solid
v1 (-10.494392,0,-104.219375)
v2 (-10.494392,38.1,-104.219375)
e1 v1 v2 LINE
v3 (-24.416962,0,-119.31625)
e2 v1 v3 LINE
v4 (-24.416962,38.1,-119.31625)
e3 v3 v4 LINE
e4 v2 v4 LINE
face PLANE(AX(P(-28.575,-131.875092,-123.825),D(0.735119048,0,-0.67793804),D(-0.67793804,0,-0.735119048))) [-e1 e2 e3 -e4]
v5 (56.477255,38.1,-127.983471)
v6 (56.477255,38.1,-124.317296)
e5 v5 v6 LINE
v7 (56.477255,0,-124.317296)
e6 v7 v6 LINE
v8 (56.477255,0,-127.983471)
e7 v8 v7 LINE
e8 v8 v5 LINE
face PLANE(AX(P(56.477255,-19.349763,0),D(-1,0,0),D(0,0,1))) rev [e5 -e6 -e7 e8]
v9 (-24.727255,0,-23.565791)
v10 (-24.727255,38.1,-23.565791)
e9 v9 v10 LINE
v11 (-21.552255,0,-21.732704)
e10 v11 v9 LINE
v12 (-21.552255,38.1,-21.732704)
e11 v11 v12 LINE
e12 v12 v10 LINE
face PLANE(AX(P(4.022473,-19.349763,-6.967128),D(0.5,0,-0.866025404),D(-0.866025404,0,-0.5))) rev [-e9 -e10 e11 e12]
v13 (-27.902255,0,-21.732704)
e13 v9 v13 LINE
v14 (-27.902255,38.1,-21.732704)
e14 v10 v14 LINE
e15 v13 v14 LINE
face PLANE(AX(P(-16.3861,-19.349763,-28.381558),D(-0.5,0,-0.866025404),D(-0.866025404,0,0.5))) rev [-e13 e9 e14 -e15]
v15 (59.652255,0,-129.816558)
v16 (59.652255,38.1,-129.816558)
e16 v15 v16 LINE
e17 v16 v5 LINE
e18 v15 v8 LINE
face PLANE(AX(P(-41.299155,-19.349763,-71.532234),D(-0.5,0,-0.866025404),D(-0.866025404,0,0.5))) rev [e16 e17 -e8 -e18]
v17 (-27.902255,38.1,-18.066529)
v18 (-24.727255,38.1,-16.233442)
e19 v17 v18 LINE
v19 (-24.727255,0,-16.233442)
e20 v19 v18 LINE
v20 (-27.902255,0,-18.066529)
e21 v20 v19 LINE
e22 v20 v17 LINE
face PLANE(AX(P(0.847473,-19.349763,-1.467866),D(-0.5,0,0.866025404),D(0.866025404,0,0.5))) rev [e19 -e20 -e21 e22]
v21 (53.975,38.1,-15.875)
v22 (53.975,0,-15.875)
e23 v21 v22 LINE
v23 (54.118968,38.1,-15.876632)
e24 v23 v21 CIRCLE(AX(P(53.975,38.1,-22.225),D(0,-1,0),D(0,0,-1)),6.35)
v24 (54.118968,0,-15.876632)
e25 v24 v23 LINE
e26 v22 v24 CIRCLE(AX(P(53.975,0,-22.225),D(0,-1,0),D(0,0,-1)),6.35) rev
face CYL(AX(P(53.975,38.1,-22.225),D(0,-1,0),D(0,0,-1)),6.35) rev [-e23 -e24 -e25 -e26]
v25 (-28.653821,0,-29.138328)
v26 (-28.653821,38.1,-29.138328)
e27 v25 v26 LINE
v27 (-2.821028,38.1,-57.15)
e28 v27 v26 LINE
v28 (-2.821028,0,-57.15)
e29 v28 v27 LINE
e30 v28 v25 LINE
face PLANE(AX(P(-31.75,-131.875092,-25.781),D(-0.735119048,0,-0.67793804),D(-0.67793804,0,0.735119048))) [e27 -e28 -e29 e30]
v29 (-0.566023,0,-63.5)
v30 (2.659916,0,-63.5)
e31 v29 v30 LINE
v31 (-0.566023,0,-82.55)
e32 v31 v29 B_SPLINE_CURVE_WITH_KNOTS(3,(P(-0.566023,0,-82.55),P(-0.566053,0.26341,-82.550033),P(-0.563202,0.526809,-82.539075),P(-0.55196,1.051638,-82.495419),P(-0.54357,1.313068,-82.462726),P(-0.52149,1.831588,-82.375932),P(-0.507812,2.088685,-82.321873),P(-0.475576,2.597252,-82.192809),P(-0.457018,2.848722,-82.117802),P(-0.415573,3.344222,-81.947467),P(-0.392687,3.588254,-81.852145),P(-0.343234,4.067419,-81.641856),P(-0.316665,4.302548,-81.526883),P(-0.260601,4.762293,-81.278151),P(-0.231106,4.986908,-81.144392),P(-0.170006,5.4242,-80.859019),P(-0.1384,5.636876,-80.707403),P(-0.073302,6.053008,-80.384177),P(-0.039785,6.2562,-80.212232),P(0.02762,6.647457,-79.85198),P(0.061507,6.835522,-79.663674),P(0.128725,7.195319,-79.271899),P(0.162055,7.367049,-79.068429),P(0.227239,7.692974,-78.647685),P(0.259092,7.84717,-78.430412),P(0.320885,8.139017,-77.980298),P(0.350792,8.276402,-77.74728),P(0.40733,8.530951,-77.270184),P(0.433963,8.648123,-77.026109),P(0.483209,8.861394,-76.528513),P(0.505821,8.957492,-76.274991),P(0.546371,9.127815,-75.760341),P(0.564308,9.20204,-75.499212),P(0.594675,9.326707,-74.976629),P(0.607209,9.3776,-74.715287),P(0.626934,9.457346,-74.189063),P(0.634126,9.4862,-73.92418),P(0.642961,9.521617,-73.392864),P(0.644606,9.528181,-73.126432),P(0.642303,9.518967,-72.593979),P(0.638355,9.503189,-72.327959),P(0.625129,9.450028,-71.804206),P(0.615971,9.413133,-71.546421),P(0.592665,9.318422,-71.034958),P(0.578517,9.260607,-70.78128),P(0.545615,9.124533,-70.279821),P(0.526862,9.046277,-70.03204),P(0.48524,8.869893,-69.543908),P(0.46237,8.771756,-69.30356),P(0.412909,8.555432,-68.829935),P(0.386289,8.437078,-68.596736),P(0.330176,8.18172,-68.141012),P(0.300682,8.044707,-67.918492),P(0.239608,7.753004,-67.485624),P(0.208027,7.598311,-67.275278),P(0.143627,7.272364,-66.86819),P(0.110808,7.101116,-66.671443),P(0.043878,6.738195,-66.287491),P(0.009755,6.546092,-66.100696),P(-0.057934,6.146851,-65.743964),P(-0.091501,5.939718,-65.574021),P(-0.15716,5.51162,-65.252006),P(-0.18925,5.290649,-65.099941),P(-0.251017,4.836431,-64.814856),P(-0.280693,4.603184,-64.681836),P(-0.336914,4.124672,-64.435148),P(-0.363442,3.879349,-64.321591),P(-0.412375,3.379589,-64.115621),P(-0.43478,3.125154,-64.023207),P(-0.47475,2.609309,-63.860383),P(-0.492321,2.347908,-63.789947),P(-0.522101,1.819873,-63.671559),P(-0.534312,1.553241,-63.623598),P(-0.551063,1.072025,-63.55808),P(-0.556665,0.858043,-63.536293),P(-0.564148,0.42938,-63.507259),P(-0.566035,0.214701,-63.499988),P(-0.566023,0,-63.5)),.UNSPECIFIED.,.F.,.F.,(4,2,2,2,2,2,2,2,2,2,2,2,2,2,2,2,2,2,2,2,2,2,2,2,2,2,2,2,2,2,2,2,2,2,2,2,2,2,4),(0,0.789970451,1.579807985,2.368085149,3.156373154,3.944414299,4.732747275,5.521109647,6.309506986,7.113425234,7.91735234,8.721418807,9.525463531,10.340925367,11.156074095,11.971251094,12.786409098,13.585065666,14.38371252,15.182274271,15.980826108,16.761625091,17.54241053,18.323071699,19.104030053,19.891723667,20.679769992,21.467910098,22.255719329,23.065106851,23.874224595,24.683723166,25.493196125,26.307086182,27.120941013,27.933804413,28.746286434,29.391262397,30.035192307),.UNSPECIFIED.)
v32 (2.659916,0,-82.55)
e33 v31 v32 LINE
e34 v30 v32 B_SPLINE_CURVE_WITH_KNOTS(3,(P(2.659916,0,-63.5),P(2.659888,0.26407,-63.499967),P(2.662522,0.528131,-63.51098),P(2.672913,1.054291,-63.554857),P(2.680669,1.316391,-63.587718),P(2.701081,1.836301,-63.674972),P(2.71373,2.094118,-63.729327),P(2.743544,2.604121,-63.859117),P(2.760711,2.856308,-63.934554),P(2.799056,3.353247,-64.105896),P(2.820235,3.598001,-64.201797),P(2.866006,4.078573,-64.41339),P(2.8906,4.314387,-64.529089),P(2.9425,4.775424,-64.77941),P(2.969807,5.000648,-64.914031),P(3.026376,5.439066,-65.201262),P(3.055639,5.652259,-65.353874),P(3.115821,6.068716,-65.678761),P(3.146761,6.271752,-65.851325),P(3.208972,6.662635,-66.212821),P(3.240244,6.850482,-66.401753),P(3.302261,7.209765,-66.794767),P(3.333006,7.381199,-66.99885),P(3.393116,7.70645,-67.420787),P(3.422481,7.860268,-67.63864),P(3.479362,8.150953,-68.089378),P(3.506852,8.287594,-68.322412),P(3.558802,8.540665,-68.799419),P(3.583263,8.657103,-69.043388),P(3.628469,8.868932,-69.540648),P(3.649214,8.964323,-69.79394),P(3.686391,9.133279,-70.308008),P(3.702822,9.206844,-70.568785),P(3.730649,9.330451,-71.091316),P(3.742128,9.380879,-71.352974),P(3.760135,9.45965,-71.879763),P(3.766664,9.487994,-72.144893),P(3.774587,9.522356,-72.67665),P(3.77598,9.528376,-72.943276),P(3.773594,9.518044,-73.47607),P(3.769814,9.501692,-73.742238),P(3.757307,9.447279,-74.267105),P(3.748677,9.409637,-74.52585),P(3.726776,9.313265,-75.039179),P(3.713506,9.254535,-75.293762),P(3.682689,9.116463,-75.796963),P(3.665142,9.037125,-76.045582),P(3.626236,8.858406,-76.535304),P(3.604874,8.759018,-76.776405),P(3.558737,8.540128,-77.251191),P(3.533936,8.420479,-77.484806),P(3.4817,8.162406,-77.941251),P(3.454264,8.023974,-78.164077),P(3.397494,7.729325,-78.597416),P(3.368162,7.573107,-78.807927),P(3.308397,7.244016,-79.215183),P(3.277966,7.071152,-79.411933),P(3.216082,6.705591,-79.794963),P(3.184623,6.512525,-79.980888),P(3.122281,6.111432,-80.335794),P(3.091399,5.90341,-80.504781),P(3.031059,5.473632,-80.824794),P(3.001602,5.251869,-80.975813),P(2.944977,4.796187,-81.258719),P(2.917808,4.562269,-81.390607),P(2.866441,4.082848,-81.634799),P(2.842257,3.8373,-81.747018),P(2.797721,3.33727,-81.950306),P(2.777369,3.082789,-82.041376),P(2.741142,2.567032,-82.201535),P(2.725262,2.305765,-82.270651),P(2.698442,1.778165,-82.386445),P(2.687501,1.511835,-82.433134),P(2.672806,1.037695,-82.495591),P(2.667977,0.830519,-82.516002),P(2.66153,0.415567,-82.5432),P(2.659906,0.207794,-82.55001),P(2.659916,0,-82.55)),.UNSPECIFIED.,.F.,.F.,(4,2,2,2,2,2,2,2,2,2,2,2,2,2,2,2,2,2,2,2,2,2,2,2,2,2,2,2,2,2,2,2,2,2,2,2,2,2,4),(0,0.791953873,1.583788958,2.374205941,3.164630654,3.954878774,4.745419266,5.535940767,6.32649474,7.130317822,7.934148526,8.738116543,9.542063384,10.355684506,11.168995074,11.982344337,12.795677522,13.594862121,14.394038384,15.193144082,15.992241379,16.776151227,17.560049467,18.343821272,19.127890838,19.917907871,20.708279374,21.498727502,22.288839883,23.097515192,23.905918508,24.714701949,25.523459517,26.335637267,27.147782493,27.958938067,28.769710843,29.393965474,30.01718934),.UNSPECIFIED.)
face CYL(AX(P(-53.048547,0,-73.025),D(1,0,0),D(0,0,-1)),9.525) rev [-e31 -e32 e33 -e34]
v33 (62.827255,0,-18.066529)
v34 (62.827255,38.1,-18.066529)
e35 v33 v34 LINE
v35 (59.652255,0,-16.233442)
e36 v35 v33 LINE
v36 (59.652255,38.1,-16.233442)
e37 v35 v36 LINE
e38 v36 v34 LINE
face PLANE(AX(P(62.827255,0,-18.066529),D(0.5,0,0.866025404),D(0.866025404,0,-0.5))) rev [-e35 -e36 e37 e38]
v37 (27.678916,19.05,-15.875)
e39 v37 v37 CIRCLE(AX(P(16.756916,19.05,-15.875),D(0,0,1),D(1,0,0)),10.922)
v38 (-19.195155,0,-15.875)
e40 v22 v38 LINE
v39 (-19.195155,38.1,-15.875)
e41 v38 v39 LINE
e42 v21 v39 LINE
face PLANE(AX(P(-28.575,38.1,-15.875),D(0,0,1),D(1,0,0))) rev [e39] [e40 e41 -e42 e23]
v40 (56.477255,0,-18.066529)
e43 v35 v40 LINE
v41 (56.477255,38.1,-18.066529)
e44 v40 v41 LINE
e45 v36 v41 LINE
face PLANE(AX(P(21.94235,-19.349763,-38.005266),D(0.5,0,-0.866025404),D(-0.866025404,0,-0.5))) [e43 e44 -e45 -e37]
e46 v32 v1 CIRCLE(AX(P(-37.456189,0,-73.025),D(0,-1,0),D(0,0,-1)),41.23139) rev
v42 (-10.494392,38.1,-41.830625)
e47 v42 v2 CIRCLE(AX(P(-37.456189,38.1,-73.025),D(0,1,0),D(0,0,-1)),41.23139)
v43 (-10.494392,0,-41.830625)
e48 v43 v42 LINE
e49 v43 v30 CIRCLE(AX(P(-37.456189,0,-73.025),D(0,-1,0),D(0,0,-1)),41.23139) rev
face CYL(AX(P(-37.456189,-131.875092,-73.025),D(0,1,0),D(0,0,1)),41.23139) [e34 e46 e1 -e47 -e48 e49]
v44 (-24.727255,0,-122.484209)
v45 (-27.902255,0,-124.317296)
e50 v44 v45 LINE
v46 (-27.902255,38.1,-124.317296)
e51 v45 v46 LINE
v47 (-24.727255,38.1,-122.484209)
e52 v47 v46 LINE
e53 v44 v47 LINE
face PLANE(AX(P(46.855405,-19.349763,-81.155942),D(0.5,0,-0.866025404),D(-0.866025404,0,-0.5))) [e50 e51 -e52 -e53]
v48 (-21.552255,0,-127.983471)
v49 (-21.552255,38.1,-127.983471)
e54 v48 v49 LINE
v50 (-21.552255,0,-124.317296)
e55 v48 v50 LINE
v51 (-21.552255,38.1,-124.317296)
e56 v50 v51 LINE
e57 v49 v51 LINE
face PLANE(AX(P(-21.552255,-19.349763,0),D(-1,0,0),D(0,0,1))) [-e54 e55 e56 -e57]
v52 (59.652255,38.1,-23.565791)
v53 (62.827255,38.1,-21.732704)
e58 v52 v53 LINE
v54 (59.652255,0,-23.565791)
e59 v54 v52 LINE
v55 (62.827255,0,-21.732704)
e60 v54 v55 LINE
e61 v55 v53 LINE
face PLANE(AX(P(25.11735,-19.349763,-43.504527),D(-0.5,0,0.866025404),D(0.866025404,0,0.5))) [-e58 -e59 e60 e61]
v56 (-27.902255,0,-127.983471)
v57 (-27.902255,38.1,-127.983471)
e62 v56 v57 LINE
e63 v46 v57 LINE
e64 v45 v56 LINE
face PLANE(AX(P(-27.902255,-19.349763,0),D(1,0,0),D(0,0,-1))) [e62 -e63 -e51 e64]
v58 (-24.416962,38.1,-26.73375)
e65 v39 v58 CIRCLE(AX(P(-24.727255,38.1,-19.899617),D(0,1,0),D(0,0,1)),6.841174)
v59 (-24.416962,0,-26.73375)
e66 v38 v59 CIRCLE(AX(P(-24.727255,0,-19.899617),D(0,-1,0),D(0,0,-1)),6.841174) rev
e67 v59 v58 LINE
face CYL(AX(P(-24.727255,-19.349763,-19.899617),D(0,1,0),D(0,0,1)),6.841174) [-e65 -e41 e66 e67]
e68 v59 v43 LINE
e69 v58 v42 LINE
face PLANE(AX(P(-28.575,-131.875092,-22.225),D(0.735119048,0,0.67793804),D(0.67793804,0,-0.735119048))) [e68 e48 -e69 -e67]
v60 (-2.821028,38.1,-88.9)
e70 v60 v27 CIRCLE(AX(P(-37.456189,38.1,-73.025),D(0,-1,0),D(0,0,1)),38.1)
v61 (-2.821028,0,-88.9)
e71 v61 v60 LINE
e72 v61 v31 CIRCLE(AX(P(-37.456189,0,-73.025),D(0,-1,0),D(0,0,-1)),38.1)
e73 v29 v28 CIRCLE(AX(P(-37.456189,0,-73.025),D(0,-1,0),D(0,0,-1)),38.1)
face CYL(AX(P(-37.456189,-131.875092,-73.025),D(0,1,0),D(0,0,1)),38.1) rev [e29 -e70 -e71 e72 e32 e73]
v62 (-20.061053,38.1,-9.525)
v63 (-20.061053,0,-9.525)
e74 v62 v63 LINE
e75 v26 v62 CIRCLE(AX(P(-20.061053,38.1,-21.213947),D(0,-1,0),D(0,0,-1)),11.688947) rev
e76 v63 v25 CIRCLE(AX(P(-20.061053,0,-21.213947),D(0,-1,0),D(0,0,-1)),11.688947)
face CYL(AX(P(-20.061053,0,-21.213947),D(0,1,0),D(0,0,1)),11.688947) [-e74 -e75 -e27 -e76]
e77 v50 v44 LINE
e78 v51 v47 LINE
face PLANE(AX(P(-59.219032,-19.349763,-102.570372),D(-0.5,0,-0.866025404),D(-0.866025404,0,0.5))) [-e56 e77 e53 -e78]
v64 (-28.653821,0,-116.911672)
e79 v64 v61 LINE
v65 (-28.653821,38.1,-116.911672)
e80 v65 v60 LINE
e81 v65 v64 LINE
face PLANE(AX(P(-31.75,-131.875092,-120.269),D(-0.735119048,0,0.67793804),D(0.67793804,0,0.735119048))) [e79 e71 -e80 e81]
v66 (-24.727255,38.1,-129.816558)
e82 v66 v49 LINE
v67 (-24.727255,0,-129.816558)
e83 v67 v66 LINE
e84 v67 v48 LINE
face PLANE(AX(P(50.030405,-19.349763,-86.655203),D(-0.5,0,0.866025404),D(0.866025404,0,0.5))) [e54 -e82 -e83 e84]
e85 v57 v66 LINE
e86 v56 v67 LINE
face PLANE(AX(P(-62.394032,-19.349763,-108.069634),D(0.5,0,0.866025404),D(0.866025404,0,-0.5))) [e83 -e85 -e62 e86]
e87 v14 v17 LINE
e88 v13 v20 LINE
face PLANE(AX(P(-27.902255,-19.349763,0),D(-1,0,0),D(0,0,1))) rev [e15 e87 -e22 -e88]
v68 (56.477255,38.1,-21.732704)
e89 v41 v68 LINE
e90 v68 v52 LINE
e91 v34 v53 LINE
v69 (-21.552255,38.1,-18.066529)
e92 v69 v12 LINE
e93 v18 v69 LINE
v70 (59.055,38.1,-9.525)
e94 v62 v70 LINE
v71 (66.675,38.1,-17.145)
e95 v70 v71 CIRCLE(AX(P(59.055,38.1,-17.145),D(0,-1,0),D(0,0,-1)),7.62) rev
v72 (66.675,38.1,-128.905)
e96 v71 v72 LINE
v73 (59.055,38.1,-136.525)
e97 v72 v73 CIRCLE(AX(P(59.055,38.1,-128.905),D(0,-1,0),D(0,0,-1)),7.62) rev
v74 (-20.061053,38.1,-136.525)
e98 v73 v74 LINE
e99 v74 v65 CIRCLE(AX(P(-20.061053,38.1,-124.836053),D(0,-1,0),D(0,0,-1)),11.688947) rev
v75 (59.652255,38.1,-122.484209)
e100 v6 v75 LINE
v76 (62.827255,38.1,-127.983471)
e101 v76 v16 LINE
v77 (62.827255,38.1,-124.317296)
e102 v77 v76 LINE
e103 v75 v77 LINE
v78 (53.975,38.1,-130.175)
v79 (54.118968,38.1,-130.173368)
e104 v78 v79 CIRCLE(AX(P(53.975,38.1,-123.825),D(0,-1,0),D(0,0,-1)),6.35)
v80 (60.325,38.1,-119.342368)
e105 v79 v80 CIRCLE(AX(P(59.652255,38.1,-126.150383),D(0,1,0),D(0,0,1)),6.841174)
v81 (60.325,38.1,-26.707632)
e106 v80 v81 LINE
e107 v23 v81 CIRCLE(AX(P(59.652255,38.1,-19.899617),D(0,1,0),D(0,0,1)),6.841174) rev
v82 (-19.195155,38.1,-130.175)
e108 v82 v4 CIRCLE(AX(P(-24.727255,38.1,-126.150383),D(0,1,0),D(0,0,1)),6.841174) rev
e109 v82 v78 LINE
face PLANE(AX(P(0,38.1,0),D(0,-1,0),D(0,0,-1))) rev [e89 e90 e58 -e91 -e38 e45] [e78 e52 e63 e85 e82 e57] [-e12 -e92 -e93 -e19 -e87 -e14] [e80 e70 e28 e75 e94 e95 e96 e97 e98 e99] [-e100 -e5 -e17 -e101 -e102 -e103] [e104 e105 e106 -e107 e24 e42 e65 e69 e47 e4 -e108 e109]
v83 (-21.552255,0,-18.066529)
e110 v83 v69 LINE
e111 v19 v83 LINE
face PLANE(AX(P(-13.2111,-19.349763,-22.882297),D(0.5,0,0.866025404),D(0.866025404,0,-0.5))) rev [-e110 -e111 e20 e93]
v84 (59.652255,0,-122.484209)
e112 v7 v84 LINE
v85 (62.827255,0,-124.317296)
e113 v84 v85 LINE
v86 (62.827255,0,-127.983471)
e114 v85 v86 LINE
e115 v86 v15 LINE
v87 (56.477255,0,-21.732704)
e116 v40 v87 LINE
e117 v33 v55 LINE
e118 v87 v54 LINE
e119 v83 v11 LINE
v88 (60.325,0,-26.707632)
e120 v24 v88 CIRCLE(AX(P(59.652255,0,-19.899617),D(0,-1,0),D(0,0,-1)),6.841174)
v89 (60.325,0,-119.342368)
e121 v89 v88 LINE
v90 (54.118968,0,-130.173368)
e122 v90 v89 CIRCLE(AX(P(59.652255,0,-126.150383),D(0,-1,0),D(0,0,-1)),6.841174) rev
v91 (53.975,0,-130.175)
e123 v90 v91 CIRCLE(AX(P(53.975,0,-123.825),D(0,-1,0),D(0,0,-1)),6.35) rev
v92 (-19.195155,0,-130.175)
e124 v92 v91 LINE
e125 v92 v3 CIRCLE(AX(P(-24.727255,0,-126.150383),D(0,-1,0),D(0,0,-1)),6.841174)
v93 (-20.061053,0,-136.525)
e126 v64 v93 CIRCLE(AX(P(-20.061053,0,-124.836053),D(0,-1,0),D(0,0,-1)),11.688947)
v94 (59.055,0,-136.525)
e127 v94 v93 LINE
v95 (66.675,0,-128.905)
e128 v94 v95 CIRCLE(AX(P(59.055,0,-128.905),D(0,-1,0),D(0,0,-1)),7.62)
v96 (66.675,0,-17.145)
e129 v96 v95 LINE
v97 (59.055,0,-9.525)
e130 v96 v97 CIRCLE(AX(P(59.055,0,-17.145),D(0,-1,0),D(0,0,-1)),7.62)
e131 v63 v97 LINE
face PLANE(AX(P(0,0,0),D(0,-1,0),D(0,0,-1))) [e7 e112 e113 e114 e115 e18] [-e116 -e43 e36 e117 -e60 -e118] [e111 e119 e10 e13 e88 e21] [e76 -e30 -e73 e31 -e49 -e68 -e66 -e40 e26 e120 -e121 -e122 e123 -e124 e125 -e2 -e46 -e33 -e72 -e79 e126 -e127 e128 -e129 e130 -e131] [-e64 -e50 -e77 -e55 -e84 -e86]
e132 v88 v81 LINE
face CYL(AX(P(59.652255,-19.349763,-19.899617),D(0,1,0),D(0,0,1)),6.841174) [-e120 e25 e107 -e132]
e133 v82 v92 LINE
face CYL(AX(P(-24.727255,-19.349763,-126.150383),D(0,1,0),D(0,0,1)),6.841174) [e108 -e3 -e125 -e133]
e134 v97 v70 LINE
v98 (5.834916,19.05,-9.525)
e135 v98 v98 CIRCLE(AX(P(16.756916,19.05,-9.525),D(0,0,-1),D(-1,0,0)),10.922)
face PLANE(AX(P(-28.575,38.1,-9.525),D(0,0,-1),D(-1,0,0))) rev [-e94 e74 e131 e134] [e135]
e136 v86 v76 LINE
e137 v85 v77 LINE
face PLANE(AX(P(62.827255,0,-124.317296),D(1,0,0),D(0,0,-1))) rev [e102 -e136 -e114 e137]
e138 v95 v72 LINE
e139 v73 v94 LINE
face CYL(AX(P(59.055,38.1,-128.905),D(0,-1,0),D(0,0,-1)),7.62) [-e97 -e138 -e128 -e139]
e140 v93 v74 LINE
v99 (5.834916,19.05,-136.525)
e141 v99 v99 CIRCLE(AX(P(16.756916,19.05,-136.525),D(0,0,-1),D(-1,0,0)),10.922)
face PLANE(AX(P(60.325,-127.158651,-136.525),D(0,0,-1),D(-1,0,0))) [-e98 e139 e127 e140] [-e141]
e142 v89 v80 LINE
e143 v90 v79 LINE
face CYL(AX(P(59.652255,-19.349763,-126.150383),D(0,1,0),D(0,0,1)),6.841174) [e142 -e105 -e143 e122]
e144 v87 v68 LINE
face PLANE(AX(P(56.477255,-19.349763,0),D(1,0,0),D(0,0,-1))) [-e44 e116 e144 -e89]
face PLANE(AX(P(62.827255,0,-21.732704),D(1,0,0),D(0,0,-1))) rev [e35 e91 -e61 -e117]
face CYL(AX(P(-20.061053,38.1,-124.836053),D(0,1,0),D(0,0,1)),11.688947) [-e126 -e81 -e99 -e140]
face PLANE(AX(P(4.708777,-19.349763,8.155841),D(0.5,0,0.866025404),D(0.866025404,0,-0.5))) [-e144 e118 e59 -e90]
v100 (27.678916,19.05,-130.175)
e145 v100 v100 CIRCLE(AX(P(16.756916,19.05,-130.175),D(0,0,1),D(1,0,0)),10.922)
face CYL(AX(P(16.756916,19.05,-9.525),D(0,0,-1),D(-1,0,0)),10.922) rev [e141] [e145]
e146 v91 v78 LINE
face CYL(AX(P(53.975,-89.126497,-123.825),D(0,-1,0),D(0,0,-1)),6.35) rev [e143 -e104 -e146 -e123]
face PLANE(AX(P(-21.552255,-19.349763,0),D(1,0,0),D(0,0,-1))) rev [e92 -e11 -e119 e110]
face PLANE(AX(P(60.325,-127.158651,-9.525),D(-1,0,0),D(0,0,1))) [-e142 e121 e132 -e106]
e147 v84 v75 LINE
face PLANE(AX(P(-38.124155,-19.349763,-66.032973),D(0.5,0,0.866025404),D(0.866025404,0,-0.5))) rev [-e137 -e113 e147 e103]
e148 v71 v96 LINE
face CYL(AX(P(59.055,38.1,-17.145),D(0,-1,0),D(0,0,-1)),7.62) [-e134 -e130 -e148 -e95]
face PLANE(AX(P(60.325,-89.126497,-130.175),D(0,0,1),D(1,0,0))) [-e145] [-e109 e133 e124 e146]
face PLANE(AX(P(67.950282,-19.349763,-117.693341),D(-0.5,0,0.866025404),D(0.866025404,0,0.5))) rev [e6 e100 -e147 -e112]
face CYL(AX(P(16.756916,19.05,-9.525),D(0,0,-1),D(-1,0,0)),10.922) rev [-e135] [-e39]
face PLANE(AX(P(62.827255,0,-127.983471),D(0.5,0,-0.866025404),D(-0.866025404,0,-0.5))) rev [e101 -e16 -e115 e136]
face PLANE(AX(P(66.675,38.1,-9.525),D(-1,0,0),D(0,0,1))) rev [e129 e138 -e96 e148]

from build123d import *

# Parameters (mm, degrees)
SKETCH1_W               = 95.25
SKETCH1_H               = 6.35
BOSS_EXTRUDE1_DEPTH     = 38.1
SKETCH2_W               = 6.35
SKETCH2_H               = 127
BOSS_EXTRUDE2_DEPTH     = 38.1
SKETCH3_W               = 88.9
SKETCH3_H               = 6.35
BOSS_EXTRUDE3_DEPTH     = 38.1
FILLET1_R               = 7.62
BOSS_EXTRUDE4_DEPTH     = 38.1
CUT_EXTRUDE8_REACH      = 171.022
CUT_EXTRUDE8_END_RADIUS = 38.1
FILLET2_R               = 11.688947
FILLET3_R               = 11.688947
FILLET4_R               = 6.35
SKETCH15_R              = 6.841174209
BOSS_EXTRUDE7_DEPTH     = 38.1
CUT_EXTRUDE12_DEPTH     = 157.640484095
SKETCH4_R               = 10.922
CUT_EXTRUDE1_DEPTH      = 149.412147861


with BuildPart() as part:
    # Sketch1 → Boss-Extrude1 (new body)
    with BuildSketch(Plane(origin=(0, 0, 0), x_dir=(1, 0, 0), z_dir=(0, 1, 0))):
        with Locations((19.05, 12.7)):
            Rectangle(SKETCH1_W, SKETCH1_H)
    extrude(amount=BOSS_EXTRUDE1_DEPTH)

    # Sketch2 → Boss-Extrude2 (add)
    with BuildSketch(Plane(origin=(0, 38.1, 0), x_dir=(1, 0, 0), z_dir=(0, 1, 0))):
        with Locations((63.5, 73.025)):
            Rectangle(SKETCH2_W, SKETCH2_H)
    extrude(amount=-BOSS_EXTRUDE2_DEPTH)

    # Sketch3 → Boss-Extrude3 (add)
    with BuildSketch(Plane(origin=(0, 38.1, 0), x_dir=(1, 0, 0), z_dir=(0, 1, 0))):
        with Locations((15.875, 133.35)):
            Rectangle(SKETCH3_W, SKETCH3_H)
    extrude(amount=-BOSS_EXTRUDE3_DEPTH)

    # Fillet1
    fillet1_edges = [part.edges().sort_by_distance(p)[0] for p in [
        (66.675, 19.05, -136.525),
        (66.675, 19.05, -9.525),
    ]]
    fillet(fillet1_edges, radius=FILLET1_R)

    # Sketch10 → Boss-Extrude4 (add)
    with BuildSketch(Plane(origin=(0, 38.1, 0), x_dir=(1, 0, 0), z_dir=(0, 1, 0))):
        with BuildLine():
            Line((-28.575, 15.875), (-28.575, 9.525))
            Line((-28.575, 9.525), (-31.75, 9.525))
            Line((-31.75, 9.525), (-31.75, 25.781))
            Line((-31.75, 25.781), (-2.821027965, 57.15))
            ThreePointArc((-2.821027965, 57.15), (0.643811071, 73.025), (-2.821027965, 88.9))
            Line((-2.821027965, 88.9), (-31.75, 120.269))
            Line((-31.75, 120.269), (-31.75, 136.525))
            Line((-31.75, 136.525), (-28.575, 136.525))
            Line((-28.575, 136.525), (-28.575, 123.825))
            Line((-28.575, 123.825), (-10.494392478, 104.219375))
            ThreePointArc((-10.494392478, 104.219375), (3.775200806, 73.025), (-10.494392478, 41.830625))
            Line((-10.494392478, 41.830625), (-28.575, 22.225))
            Line((-28.575, 22.225), (-28.575, 15.875))
        make_face()
    extrude(amount=-BOSS_EXTRUDE4_DEPTH)

    # Cut-Extrude8: up to this cylinder (the profile starts outside it)
    cut_extrude8_end = Plane(origin=(-37.456188929, 4.042536, -73.025), z_dir=(0, 1, 0)) * Cylinder(CUT_EXTRUDE8_END_RADIUS, 419.244, mode=Mode.PRIVATE)
    # Sketch12 → Cut-Extrude8 (cut, up to the surface)
    with BuildSketch(Plane.ZY.offset(-60.325), mode=Mode.PRIVATE) as cut_extrude8_sk1:
        with BuildLine():
            Line((-82.55, 0), (-63.5, 0))
            ThreePointArc((-63.5, 0), (-73.025, 9.525), (-82.55, 0))
        make_face()
    cut_extrude8_tool1 = extrude(cut_extrude8_sk1.sketch, amount=CUT_EXTRUDE8_REACH, mode=Mode.PRIVATE) - cut_extrude8_end
    add(cut_extrude8_tool1.solids().sort_by_distance((60.325, 4.042536, -73.025))[0], mode=Mode.SUBTRACT)

    # Fillet2
    fillet2_edges = [part.edges().sort_by_distance(p)[0] for p in [
        (-31.75, 19.05, -136.525),
        (-31.75, 19.05, -120.269),
    ]]
    fillet(fillet2_edges, radius=FILLET2_R - 0.0001)  # a hair under: the kernel refuses the full size

    # Fillet3
    fillet3_edges = [part.edges().sort_by_distance(p)[0] for p in [
        (-31.75, 19.05, -25.781),
        (-31.75, 19.05, -9.525),
    ]]
    fillet(fillet3_edges, radius=FILLET3_R - 0.0001)  # a hair under: the kernel refuses the full size

    # Fillet4
    fillet4_edges = [part.edges().sort_by_distance(p)[0] for p in [
        (60.325, 19.05, -15.875),
        (60.325, 19.05, -130.175),
    ]]
    fillet(fillet4_edges, radius=FILLET4_R)

    # Sketch15 → Boss-Extrude7 (add)
    # profile 1 of 4: a face of its own
    with BuildSketch(Plane(origin=(0, 38.1, 0), x_dir=(1, 0, 0), z_dir=(0, 1, 0))):
        with Locations((59.652254611, 126.150383493)):
            Circle(SKETCH15_R)
        Polygon((59.652254611, 129.816557703), (56.477254611, 127.983470598), (56.477254611, 124.317296388), (59.652254611, 122.484209284), (62.827254611, 124.317296388), (62.827254611, 127.983470598), align=None, mode=Mode.SUBTRACT)
    # profile 2 of 4: a face of its own
    with BuildSketch(Plane(origin=(0, 38.1, 0), x_dir=(1, 0, 0), z_dir=(0, 1, 0))):
        with Locations((-24.727254611, 19.899616507)):
            Circle(SKETCH15_R)
        Polygon((-21.552254611, 21.732703612), (-24.727254611, 23.565790716), (-27.902254611, 21.732703612), (-27.902254611, 18.066529402), (-24.727254611, 16.233442297), (-21.552254611, 18.066529402), align=None, mode=Mode.SUBTRACT)
    # profile 3 of 4: a face of its own
    with BuildSketch(Plane(origin=(0, 38.1, 0), x_dir=(1, 0, 0), z_dir=(0, 1, 0))):
        with Locations((-24.727254611, 126.150383493)):
            Circle(SKETCH15_R)
        Polygon((-21.552254611, 127.983470598), (-21.552254611, 124.317296388), (-24.727254611, 122.484209284), (-27.902254611, 124.317296388), (-27.902254611, 127.983470598), (-24.727254611, 129.816557703), align=None, mode=Mode.SUBTRACT)
    # profile 4 of 4: a face of its own
    with BuildSketch(Plane(origin=(0, 38.1, 0), x_dir=(1, 0, 0), z_dir=(0, 1, 0))):
        with Locations((59.652254611, 19.899616507)):
            Circle(SKETCH15_R)
        Polygon((56.477254611, 18.066529402), (56.477254611, 21.732703612), (59.652254611, 23.565790716), (62.827254611, 21.732703612), (62.827254611, 18.066529402), (59.652254611, 16.233442297), align=None, mode=Mode.SUBTRACT)
    extrude(amount=-BOSS_EXTRUDE7_DEPTH)

    # Sketch21 → Cut-Extrude12 (cut, through all)
    with BuildSketch(Plane(origin=(0, 38.1, 0), x_dir=(1, 0, 0), z_dir=(0, 1, 0))):
        Polygon((-21.552254611, 21.732703612), (-24.727254611, 23.565790716), (-27.902254611, 21.732703612), (-27.902254611, 18.066529402), (-24.727254611, 16.233442297), (-21.552254611, 18.066529402), align=None)
        Polygon((56.477254611, 18.066529402), (56.477254611, 21.732703612), (59.652254611, 23.565790716), (62.827254611, 21.732703612), (62.827254611, 18.066529402), (59.652254611, 16.233442297), align=None)
        Polygon((59.652254611, 129.816557703), (56.477254611, 127.983470598), (56.477254611, 124.317296388), (59.652254611, 122.484209284), (62.827254611, 124.317296388), (62.827254611, 127.983470598), align=None)
        Polygon((-21.552254611, 127.983470598), (-21.552254611, 124.317296388), (-24.727254611, 122.484209284), (-27.902254611, 124.317296388), (-27.902254611, 127.983470598), (-24.727254611, 129.816557703), align=None)
    extrude(amount=-CUT_EXTRUDE12_DEPTH, mode=Mode.SUBTRACT)

    # Sketch4 → Cut-Extrude1 (cut, through all)
    with BuildSketch(Plane(origin=(0, 0, -136.525), x_dir=(-1, 0, 0), z_dir=(0, 0, -1))):
        with Locations((-16.756915998, 19.05)):
            Circle(SKETCH4_R)
    extrude(amount=-CUT_EXTRUDE1_DEPTH, mode=Mode.SUBTRACT)


solid = part.part
